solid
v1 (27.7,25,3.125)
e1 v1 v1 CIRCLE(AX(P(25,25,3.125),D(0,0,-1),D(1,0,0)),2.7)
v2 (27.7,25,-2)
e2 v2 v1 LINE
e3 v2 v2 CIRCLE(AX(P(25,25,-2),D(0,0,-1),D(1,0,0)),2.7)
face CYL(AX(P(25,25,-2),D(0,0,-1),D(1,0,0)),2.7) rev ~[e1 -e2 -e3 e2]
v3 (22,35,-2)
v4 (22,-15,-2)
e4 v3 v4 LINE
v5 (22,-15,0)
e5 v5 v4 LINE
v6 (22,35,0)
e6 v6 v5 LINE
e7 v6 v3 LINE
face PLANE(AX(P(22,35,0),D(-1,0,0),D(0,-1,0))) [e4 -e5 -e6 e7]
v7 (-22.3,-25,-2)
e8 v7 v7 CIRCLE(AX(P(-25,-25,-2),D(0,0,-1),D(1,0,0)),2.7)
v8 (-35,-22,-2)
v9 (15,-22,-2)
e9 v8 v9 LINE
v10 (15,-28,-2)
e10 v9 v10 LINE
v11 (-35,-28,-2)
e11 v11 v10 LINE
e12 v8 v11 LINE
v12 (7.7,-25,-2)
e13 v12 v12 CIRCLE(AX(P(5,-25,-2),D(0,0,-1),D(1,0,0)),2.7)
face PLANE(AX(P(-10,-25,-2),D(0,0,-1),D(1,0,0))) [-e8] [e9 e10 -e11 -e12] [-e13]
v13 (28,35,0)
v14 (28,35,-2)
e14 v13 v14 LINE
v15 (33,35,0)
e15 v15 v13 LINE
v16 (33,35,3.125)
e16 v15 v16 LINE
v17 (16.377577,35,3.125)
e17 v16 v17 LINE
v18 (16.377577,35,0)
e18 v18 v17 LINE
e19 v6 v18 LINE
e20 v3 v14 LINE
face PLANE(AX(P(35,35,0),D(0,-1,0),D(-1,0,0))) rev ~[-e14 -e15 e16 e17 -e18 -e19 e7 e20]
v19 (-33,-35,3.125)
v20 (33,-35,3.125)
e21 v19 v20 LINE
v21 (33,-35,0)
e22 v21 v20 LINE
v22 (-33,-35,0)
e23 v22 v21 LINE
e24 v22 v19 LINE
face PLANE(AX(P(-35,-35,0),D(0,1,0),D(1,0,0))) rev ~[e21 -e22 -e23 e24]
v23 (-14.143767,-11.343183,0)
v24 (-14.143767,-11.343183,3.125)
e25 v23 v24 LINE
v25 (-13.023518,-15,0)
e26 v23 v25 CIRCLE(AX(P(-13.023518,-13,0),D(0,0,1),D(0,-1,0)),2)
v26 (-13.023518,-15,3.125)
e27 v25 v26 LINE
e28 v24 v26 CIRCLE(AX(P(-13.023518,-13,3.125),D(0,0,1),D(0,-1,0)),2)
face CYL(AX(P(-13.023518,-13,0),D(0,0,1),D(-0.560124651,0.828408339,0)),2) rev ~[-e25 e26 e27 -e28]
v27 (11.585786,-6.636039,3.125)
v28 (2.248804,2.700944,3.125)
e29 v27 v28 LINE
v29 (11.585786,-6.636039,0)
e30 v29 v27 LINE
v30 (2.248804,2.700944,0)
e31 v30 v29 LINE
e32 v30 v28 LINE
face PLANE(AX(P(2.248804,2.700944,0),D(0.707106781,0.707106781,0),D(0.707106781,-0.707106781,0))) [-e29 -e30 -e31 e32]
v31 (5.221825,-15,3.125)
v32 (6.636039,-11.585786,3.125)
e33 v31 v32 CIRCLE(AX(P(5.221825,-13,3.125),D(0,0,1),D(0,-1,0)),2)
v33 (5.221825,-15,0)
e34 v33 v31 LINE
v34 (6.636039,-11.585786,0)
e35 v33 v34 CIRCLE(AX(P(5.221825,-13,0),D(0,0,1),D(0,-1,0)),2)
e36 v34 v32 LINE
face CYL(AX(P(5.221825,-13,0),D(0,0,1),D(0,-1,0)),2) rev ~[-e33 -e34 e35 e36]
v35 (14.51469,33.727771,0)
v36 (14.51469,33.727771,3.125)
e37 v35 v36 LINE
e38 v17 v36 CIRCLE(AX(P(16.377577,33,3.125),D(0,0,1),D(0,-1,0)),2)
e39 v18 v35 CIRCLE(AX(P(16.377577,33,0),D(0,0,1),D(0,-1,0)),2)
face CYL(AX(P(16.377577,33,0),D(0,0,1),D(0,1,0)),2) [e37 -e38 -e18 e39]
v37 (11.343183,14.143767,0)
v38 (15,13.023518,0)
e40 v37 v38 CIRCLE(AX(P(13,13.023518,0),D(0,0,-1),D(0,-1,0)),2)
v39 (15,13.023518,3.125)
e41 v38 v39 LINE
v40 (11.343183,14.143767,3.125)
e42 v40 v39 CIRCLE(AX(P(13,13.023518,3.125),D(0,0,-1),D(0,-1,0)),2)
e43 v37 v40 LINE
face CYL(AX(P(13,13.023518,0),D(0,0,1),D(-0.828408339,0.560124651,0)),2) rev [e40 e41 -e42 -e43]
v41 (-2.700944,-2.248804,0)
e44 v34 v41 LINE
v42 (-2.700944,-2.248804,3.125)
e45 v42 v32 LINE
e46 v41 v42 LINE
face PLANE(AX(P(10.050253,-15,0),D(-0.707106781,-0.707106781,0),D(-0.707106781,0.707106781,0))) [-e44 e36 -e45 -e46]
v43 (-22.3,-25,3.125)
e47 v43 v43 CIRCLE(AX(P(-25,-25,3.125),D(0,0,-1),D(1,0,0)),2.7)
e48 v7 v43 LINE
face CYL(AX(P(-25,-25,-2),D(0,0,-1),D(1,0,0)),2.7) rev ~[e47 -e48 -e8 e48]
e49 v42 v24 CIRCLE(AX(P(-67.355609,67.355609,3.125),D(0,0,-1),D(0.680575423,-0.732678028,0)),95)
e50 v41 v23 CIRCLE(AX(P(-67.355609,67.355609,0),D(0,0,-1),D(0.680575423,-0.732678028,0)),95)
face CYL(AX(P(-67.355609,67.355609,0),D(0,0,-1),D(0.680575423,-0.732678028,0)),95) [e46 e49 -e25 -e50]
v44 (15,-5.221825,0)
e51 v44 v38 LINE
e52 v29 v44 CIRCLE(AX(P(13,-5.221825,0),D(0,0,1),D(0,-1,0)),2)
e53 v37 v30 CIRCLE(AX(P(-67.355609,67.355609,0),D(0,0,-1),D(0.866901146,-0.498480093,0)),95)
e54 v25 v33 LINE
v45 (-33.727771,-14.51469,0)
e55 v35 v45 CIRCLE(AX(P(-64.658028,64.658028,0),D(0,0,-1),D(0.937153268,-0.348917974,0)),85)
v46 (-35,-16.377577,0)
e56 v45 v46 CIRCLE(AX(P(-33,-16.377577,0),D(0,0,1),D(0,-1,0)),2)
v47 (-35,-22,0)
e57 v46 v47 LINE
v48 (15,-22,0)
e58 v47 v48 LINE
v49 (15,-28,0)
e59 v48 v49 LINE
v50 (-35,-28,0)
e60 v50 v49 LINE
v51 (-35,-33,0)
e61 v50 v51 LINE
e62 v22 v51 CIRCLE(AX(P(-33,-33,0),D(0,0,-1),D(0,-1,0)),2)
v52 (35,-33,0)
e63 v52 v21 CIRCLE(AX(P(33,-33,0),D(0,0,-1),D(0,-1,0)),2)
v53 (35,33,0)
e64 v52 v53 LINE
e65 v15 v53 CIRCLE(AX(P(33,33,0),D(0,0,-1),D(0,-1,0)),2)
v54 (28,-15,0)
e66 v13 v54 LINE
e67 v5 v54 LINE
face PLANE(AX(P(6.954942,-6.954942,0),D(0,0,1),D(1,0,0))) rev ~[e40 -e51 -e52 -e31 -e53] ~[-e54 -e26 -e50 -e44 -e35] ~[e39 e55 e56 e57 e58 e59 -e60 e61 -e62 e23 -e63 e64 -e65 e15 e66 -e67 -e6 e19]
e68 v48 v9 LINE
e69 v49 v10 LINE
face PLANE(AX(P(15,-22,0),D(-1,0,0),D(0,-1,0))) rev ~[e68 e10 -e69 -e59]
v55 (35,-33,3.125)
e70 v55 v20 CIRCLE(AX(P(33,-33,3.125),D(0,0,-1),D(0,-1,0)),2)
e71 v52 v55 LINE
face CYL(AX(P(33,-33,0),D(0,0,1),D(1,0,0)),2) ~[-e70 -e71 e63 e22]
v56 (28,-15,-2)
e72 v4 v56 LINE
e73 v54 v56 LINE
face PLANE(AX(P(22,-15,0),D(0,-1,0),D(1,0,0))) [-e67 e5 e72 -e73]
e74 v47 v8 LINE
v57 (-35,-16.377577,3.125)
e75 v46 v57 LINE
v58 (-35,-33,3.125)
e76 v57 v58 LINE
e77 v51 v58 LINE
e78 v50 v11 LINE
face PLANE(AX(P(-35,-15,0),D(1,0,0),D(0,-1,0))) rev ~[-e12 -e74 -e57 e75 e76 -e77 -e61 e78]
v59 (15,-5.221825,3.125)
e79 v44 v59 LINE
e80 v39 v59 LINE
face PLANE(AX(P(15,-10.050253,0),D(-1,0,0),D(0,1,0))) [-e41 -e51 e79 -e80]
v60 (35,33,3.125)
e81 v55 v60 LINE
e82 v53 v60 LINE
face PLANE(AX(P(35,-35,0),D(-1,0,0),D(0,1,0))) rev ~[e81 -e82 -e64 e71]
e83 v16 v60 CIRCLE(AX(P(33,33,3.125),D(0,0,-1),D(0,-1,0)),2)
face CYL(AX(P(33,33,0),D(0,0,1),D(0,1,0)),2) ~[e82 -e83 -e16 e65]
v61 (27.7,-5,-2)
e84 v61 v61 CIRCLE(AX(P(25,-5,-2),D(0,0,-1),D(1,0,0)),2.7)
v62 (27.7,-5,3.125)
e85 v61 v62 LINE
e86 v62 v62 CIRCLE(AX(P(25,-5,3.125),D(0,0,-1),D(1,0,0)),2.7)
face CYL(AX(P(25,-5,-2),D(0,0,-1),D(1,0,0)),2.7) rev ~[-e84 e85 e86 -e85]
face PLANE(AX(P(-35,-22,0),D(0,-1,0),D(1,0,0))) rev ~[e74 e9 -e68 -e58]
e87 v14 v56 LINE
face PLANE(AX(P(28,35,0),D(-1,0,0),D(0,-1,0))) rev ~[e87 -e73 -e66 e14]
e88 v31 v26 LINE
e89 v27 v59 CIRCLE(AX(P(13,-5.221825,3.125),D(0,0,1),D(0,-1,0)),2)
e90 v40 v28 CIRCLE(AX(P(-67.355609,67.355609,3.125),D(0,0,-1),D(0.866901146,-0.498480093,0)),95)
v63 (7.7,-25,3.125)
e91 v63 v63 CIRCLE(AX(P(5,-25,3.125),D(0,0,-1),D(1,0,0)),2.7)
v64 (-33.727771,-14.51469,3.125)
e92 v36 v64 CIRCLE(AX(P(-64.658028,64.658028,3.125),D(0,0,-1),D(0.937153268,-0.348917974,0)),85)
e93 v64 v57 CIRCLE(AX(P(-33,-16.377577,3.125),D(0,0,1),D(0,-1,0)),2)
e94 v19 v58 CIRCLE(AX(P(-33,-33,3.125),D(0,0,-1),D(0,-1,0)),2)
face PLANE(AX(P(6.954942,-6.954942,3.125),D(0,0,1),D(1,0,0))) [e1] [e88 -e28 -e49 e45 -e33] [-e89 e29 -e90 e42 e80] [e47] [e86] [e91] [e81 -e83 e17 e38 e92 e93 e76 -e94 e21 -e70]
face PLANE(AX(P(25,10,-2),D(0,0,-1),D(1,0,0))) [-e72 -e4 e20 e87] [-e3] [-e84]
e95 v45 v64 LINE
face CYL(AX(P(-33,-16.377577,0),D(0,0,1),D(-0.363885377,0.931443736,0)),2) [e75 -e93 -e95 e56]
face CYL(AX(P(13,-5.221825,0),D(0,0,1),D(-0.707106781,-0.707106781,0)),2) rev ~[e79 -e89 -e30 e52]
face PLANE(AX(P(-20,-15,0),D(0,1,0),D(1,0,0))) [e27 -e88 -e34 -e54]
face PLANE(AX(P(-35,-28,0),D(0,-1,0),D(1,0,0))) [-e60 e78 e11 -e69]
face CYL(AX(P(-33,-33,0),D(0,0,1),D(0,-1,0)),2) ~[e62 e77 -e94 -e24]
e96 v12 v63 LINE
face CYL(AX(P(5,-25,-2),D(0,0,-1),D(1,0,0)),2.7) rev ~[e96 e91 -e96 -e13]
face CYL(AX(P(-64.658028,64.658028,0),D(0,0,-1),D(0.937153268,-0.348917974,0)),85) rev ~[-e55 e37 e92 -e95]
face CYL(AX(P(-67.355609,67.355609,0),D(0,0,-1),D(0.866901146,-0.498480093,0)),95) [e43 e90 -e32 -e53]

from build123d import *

# Parameters (mm, degrees)
F1_DEPTH = 3.125
F2_W     = 6
F2_H     = 50
F2_W_2   = 50
F2_H_2   = 6
F3_DEPTH = 2
F4_R     = 2.7
F5_DEPTH = 25
F6_R     = 2
F8_DEPTH = 25
F9_R     = 2


# Not quite as in the source:
# - a feature names something its author has since deleted; it is built from what else it names


with BuildPart() as f1:
    # F0 (on Top) → F1 (new body)
    with BuildSketch(Plane.XY):
        with BuildLine():
            Line((35, 35), (15, 35))
            ThreePointArc((15, 35), (-4.5539513718, 4.5539513718), (-35, -15))
            Line((-35, -15), (-35, -35))
            Line((-35, -35), (35, -35))
            Line((35, -35), (35, 35))
        make_face()
    extrude(amount=F1_DEPTH)

    # F2 (on face) → F3 (join)
    with BuildSketch(Plane(origin=(0, 0, 0), x_dir=(1, 0, 0), z_dir=(0, 0, -1))):
        with Locations((25, -10)):
            Rectangle(F2_W, F2_H)
        with Locations((-10, 25)):
            Rectangle(F2_W_2, F2_H_2)
    extrude(amount=F3_DEPTH)

    # F4 (on face) → F5 (cut)
    with BuildSketch(Plane(origin=(0, 0, -2), x_dir=(1, 0, 0), z_dir=(0, 0, -1))):
        with Locations((25, -25)):
            Circle(F4_R)
        with Locations((25, 5)):
            Circle(F4_R)
        with Locations((5, 25)):
            Circle(F4_R)
        with Locations((-25, 25)):
            Circle(F4_R)
    extrude(amount=-F5_DEPTH, mode=Mode.SUBTRACT)

    # F6
    f6_edges = [f1.edges().sort_by_distance(p)[0] for p in [
        (35, 35, 1.5625),
        (15, 35, 1.5625),
        (-35, -15, 1.5625),
        (-35, -35, 1.5625),
        (35, -35, 1.5625),
    ]]
    fillet(f6_edges, radius=F6_R)

    # F7 (on Top) → F8 (cut)
    with BuildSketch(Plane.XY):
        with BuildLine():
            Line((15, -10.0502525317), (15, 20))
            ThreePointArc((15, 20), (9.1151461726, 10.9887424757), (2.2488038315, 2.7009436368))
            Line((2.2488038315, 2.7009436368), (15, -10.0502525317))
        make_face()
        with BuildLine():
            ThreePointArc((-2.7009436368, -2.2488038315), (-10.9887424757, -9.1151461726), (-20, -15))
            Line((-20, -15), (10.0502525317, -15))
            Line((10.0502525317, -15), (-2.7009436368, -2.2488038315))
        make_face()
    extrude(amount=F8_DEPTH, mode=Mode.SUBTRACT)

    # F9
    f9_edges = [f1.edges().sort_by_distance(p)[0] for p in [
        (15, 20, 1.5625),
        (-20, -15, 1.5625),
        (10.050253, -15, 1.5625),
        (15, -10.050253, 1.5625),
    ]]
    fillet(f9_edges, radius=F9_R)


solid = f1.part
